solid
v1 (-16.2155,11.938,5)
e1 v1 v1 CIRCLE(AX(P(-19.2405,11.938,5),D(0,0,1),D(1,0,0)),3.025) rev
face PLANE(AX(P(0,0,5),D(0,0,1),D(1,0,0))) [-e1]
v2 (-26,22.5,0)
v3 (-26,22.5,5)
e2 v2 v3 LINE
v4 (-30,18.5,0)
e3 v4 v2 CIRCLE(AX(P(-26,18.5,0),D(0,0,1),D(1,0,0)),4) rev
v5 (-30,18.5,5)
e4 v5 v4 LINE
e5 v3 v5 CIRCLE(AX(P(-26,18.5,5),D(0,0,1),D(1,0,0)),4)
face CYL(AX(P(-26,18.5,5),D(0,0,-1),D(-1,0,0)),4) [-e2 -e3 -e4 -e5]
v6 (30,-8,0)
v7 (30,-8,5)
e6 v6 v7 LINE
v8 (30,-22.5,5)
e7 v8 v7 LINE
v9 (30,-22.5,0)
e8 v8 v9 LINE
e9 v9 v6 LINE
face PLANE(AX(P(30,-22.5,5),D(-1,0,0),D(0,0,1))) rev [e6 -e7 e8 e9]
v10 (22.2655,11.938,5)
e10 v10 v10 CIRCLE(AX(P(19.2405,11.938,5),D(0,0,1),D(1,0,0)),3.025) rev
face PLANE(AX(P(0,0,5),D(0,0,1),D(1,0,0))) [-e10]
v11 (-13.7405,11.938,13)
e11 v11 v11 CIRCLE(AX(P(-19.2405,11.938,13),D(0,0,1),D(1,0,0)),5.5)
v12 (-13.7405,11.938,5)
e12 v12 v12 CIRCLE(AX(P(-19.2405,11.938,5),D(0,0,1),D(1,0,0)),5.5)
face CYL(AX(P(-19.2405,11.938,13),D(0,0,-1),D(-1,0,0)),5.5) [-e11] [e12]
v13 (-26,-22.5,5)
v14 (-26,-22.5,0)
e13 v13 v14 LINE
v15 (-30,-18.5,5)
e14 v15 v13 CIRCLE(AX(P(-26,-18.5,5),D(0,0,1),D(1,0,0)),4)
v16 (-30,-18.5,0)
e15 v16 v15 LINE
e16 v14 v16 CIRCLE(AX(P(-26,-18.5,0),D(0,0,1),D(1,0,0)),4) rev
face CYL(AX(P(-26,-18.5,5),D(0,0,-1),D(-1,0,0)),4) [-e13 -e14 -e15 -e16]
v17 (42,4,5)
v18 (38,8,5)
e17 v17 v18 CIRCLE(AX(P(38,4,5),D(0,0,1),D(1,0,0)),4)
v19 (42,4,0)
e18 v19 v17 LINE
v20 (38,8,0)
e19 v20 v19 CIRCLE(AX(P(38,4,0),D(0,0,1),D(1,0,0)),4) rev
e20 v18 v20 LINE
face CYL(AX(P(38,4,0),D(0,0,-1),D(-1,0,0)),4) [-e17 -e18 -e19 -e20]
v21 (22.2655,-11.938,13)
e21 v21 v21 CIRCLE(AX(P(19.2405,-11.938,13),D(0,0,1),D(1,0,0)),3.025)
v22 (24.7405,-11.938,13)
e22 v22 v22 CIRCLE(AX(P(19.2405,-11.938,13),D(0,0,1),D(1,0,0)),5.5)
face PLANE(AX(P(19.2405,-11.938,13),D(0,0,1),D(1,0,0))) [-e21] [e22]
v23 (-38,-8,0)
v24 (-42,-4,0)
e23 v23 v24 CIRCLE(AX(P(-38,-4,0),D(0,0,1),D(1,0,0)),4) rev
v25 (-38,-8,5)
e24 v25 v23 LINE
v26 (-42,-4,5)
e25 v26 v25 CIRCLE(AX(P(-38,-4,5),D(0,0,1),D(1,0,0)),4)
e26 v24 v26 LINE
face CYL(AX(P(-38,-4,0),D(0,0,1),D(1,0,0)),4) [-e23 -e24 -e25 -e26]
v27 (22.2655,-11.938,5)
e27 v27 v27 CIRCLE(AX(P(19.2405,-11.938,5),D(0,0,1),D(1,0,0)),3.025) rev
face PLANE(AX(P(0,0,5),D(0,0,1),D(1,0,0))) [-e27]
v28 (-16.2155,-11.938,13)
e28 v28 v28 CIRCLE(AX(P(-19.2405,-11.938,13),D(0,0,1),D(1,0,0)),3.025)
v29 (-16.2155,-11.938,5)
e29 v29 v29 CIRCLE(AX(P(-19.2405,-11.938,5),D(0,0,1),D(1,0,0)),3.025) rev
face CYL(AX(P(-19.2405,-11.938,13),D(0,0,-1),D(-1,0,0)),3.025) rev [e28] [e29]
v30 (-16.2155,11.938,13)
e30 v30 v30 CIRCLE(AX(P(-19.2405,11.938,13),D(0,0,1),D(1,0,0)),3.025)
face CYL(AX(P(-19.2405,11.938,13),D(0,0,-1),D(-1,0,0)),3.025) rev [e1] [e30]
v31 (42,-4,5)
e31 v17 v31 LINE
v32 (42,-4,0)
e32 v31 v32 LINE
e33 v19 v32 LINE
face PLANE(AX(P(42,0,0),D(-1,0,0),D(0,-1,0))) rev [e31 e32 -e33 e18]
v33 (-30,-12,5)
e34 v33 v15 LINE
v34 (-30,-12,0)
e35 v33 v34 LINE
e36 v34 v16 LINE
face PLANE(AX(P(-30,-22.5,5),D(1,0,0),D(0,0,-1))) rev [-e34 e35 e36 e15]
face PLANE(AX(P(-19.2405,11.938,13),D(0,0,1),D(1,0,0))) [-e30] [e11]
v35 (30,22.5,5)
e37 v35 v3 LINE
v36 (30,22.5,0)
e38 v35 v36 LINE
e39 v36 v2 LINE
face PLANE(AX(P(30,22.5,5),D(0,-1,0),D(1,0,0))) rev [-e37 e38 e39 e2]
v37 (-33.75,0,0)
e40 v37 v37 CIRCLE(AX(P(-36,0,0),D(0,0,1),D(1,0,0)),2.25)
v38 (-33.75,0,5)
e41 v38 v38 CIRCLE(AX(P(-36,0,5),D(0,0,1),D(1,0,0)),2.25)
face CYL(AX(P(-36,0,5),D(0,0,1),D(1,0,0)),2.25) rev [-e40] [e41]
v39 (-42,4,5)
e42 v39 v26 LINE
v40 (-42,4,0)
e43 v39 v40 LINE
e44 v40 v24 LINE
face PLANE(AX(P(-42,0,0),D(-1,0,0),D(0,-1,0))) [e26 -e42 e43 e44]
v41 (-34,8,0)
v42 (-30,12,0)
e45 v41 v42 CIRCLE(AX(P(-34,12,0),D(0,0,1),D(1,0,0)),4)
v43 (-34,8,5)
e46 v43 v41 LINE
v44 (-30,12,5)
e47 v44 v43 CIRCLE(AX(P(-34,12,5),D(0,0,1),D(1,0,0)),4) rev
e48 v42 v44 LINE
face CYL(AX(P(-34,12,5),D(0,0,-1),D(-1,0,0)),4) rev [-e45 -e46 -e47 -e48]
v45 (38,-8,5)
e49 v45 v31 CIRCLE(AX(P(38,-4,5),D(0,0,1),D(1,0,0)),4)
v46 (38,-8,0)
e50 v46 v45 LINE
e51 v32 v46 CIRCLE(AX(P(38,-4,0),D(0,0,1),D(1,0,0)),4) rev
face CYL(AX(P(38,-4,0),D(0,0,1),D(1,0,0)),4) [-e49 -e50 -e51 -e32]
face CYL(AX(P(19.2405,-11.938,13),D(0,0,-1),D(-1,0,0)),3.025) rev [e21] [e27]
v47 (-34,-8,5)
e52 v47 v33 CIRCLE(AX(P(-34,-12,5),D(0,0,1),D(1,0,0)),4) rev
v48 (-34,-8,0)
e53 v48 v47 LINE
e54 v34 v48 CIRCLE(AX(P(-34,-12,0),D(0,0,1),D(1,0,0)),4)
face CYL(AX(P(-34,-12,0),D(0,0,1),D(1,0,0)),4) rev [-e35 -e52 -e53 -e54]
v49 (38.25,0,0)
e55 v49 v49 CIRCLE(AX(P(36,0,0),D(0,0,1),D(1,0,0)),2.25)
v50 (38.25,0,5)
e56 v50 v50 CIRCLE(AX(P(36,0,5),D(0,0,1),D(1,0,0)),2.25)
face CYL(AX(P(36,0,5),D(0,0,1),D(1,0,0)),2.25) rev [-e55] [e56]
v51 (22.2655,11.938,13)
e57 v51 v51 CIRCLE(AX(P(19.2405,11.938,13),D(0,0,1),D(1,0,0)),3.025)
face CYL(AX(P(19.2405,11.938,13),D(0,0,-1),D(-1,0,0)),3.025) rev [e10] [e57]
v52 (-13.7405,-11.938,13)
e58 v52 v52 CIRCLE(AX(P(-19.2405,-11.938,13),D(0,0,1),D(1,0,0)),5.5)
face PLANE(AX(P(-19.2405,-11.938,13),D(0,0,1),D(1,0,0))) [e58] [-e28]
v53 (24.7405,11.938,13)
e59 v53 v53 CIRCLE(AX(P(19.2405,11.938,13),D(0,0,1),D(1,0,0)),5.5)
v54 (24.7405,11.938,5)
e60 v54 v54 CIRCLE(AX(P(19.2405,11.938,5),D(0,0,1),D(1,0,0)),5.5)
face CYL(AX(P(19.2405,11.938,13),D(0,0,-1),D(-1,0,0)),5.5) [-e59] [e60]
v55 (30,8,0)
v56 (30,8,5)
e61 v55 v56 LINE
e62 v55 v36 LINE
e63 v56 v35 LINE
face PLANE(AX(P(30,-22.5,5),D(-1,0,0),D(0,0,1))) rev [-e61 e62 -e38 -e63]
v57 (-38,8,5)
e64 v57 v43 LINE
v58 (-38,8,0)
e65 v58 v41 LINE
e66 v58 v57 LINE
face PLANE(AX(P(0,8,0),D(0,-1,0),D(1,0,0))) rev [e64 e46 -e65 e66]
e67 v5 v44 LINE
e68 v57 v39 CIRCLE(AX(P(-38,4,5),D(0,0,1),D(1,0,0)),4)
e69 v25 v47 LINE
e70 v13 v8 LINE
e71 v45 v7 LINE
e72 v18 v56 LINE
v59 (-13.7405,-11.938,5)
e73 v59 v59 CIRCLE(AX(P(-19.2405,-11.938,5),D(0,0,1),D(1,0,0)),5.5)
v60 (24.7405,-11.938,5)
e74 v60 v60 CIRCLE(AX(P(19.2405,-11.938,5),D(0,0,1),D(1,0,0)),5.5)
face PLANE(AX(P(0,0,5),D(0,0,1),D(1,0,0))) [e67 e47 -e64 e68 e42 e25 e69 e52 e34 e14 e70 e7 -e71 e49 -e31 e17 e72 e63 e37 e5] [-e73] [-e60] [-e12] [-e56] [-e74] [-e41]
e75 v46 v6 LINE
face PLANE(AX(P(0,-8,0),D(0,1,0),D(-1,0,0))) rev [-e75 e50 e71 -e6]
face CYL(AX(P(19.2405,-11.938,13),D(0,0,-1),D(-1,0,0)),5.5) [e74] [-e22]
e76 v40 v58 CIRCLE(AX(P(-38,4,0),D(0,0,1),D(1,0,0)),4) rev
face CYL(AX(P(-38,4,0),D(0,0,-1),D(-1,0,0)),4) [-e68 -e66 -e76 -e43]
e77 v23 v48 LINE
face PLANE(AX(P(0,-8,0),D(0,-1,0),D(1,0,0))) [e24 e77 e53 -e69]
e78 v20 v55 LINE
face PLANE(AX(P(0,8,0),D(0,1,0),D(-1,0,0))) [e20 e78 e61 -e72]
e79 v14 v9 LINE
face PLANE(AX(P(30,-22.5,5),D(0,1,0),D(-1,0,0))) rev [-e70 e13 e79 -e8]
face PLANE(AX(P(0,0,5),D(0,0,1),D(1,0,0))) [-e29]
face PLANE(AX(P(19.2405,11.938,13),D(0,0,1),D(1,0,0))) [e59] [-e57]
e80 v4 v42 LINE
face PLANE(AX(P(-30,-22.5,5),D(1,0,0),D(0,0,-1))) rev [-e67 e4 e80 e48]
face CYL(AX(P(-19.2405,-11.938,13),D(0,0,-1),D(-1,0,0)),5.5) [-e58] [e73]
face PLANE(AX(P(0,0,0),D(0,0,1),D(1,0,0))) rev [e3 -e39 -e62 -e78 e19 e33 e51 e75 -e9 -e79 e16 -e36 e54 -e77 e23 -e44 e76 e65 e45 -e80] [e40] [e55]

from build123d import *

# Parameters (mm, degrees)
SKETCH1_W            = 60
SKETCH1_H            = 45
BOSS_EXTRUDE1_DEPTH  = 5
SKETCH3_R            = 5.5
SKETCH3_R_2          = 3.025
BOSS_EXTRUDE2_DEPTH  = 8
SKETCH4_W            = 12
SKETCH4_H            = 16
SKETCH4_R            = 2.55
BOSS_EXTRUDE3_DEPTH  = 5
FILLET1_R            = 4
M4_CLEARANCE_HOLE1_D = 4.5
MIRROR1_OUTLINE_R    = 2.25
MIRROR1_DEPTH        = 5


# Read off the part's stored shape, not the designer's step: Mirror1
with BuildPart() as part:
    # Sketch1 → Boss-Extrude1 (new body)
    with BuildSketch(Plane.XY):
        Rectangle(SKETCH1_W, SKETCH1_H)
    extrude(amount=BOSS_EXTRUDE1_DEPTH)

    # Sketch3 → Boss-Extrude2 (add)
    # profile 1 of 4: a face of its own
    with BuildSketch(Plane.XY.offset(5)):
        with Locations((-19.2405, 11.938)):
            Circle(SKETCH3_R)
        with Locations((-19.2405, 11.938)):
            Circle(SKETCH3_R_2, mode=Mode.SUBTRACT)
    # profile 2 of 4: a face of its own
    with BuildSketch(Plane.XY.offset(5)):
        with Locations((-19.2405, -11.938)):
            Circle(SKETCH3_R)
        with Locations((-19.2405, -11.938)):
            Circle(SKETCH3_R_2, mode=Mode.SUBTRACT)
    # profile 3 of 4: a face of its own
    with BuildSketch(Plane.XY.offset(5)):
        with Locations((19.2405, 11.938)):
            Circle(SKETCH3_R)
        with Locations((19.2405, 11.938)):
            Circle(SKETCH3_R_2, mode=Mode.SUBTRACT)
    # profile 4 of 4: a face of its own
    with BuildSketch(Plane.XY.offset(5)):
        with Locations((19.2405, -11.938)):
            Circle(SKETCH3_R)
        with Locations((19.2405, -11.938)):
            Circle(SKETCH3_R_2, mode=Mode.SUBTRACT)
    extrude(amount=BOSS_EXTRUDE2_DEPTH)

    # Sketch4 → Boss-Extrude3 (add)
    # profile 1 of 2: a face of its own
    with BuildSketch(Plane.XY.offset(5)):
        with Locations((-36, 0)):
            Rectangle(SKETCH4_W, SKETCH4_H)
        with Locations((-36, 0)):
            Circle(SKETCH4_R, mode=Mode.SUBTRACT)
    # profile 2 of 2: a face of its own
    with BuildSketch(Plane.XY.offset(5)):
        with Locations((-36, 0)):
            Circle(SKETCH4_R)
    extrude(amount=-BOSS_EXTRUDE3_DEPTH)

    # Fillet1
    fillet1_edges = [part.edges().sort_by_distance(p)[0] for p in [
        (-42, -8, 2.5),
        (-42, 8, 2.5),
        (-30, 8, 2.5),
        (-30, -8, 2.5),
        (-30, 22.5, 2.5),
        (-30, -22.5, 2.5),
    ]]
    fillet(fillet1_edges, radius=FILLET1_R)

    # M4 Clearance Hole1 (through all)
    with Locations(Plane.XY.offset(5)):
        with Locations((-36, 0)):
            Hole(M4_CLEARANCE_HOLE1_D / 2)

    # Mirror1 outline → Mirror1 (add)
    with BuildSketch(Plane.XY):
        with BuildLine():
            ThreePointArc((42, 4), (40.828427125, 6.828427125), (38, 8))
            Line((38, 8), (30, 8))
            Line((30, 8), (30, -8))
            Line((30, -8), (38, -8))
            ThreePointArc((38, -8), (40.828427125, -6.828427125), (42, -4))
            Line((42, -4), (42, 4))
        make_face()
        with Locations((36, 0)):
            Circle(MIRROR1_OUTLINE_R, mode=Mode.SUBTRACT)
    extrude(amount=MIRROR1_DEPTH)


solid = part.part
